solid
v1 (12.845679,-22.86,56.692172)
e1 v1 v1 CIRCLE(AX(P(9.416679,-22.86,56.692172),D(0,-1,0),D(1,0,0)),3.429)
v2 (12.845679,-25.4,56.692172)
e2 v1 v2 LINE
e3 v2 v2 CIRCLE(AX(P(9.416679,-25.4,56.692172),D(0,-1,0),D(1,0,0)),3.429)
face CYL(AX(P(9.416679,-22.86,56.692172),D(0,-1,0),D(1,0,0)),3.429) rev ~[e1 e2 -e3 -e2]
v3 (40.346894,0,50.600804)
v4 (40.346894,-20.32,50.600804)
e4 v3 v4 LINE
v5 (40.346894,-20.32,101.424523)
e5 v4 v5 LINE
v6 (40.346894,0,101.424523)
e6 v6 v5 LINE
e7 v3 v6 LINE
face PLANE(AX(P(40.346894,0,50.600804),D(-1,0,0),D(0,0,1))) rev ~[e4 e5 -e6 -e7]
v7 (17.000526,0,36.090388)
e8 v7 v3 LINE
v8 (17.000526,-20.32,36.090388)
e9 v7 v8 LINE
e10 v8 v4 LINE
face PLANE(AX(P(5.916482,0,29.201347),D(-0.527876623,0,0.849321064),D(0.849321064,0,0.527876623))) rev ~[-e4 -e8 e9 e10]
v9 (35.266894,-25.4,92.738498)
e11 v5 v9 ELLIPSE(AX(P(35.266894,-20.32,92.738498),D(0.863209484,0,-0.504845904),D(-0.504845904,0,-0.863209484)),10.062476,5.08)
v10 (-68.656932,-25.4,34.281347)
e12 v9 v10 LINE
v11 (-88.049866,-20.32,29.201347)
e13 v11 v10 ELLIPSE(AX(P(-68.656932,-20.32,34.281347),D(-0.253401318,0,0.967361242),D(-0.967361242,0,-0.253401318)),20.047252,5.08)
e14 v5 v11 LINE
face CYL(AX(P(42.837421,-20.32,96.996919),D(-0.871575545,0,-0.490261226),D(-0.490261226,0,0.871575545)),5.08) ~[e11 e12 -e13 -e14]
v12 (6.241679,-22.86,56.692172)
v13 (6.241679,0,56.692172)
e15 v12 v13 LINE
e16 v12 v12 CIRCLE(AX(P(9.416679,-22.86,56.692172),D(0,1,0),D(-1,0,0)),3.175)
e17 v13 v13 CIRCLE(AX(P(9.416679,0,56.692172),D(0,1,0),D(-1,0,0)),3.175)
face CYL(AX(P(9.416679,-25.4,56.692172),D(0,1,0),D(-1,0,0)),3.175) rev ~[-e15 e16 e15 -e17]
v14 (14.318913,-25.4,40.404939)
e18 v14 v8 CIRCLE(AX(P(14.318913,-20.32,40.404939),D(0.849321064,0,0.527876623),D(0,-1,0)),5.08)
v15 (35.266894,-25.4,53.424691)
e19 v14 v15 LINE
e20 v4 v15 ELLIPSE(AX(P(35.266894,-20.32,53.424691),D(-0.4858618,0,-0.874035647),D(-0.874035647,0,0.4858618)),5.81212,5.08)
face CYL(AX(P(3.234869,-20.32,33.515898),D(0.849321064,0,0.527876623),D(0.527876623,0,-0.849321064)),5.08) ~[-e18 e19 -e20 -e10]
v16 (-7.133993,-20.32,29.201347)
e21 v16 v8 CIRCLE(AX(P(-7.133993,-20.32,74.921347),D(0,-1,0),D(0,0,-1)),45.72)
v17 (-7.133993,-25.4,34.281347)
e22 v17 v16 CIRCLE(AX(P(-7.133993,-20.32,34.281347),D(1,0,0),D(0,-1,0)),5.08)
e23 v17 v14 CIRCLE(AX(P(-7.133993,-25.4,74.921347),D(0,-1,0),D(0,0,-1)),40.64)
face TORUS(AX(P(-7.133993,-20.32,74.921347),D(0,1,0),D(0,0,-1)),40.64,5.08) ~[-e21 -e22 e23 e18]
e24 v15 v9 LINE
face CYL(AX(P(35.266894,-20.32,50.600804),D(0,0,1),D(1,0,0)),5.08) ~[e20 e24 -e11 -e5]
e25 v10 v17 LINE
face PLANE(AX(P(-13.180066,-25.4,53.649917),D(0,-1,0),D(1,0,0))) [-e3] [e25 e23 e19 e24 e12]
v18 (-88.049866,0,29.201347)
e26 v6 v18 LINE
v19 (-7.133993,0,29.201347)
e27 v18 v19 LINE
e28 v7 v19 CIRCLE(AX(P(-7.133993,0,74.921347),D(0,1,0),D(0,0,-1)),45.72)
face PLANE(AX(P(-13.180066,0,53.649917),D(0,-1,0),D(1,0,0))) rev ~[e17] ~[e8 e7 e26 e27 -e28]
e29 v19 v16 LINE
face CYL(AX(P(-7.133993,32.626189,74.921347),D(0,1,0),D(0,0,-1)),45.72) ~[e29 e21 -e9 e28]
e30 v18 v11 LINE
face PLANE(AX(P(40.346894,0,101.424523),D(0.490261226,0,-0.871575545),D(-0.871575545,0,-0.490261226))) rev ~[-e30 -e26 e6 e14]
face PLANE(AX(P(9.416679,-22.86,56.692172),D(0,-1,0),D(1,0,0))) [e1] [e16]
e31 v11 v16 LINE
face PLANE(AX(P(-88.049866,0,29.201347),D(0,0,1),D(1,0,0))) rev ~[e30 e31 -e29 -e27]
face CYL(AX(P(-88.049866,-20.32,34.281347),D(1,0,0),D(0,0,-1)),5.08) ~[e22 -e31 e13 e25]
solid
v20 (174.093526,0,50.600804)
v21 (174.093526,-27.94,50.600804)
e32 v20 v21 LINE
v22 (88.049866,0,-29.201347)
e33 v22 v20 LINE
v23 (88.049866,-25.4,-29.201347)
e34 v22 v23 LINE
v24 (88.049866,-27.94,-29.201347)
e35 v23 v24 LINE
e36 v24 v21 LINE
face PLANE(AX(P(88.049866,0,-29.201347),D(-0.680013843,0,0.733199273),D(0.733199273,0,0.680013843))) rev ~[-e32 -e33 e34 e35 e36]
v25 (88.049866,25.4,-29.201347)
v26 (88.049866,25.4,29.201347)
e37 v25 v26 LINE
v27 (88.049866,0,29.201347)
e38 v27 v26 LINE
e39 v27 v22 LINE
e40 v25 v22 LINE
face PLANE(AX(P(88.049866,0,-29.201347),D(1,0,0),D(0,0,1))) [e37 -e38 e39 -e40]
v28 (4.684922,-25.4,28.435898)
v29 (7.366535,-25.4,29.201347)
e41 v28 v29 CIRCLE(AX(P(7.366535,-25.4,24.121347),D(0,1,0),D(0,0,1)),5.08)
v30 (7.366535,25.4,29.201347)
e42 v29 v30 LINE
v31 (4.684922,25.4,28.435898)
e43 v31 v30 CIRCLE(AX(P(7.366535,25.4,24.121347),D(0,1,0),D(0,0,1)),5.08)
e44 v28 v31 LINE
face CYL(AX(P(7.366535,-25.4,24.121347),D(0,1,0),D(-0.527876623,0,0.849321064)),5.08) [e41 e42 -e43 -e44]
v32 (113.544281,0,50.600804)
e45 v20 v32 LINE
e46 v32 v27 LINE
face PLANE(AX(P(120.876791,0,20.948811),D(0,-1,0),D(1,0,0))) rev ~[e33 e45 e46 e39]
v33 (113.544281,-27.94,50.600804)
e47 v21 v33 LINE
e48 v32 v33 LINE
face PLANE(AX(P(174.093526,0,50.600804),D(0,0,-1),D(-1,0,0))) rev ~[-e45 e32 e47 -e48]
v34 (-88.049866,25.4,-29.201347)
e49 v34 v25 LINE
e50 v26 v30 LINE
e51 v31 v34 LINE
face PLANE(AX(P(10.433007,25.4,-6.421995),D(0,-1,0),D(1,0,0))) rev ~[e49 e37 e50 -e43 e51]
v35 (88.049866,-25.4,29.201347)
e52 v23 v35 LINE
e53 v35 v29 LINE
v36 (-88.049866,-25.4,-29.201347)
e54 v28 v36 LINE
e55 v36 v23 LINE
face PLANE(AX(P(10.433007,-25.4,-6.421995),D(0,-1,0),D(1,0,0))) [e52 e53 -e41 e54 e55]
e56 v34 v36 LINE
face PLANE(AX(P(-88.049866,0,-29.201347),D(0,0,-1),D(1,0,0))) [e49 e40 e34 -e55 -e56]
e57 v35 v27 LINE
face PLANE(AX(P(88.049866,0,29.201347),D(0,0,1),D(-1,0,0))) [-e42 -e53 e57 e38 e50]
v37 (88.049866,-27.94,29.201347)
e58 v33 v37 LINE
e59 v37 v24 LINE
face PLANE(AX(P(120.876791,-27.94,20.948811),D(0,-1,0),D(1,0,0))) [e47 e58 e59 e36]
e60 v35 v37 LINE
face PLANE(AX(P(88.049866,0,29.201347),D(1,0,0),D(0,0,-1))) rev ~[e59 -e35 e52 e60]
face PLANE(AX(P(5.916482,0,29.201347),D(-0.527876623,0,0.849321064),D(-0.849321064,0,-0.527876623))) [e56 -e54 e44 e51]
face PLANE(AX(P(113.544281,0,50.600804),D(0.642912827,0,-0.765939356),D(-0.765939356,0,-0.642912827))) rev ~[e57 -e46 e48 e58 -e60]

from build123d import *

# Parameters (mm, degrees)
F1_DEPTH       = 25.4
F2_DEPTH       = 25.4
F3_DEPTH       = 27.94
F4_R           = 5.08
F5_R           = 5.08
F6_T1_DEPTH    = 58.0261887235
F6_T4_ANGLE    = 31.8620987779
F8_D           = 6.35
F8_CBORE_D     = 6.858
F8_CBORE_DEPTH = 2.54


# Not quite as in the source:
# - a fillet or chamfer that OpenCascade refuses, or shapes differently, is made with other operations: its cross-section is extruded or revolved along the edge and cut away or added


with BuildPart() as f1:
    # F0 (on Front) → F1 (new body, symmetric)
    with BuildSketch(Plane.XZ):
        Polygon((5.9164824631, 29.2013473809), (-88.0498662591, -29.2013473809), (88.0498662591, -29.2013473809), (88.0498662591, 29.2013473809), align=None)
    extrude(amount=F1_DEPTH, both=True)

    # F0 (on Front) → F3 (join)
    with BuildSketch(Plane.XZ):
        Polygon((88.0498662591, 29.2013473809), (88.0498662591, -29.2013473809), (174.0935258567, 50.6008043885), (113.5442811233, 50.6008043885), align=None)
    extrude(amount=F3_DEPTH)

    # F5
    f5_edges = [f1.edges().sort_by_distance(p)[0] for p in [
        (5.916482, 0, 29.201347),
    ]]
    fillet(f5_edges, radius=F5_R)


with BuildPart() as f2:
    # F0 (on Front) → F2 (new body)
    with BuildSketch(Plane.XZ):
        Polygon((40.3468944132, 101.4245226979), (-88.0498662591, 29.2013473809), (5.9164824631, 29.2013473809), (40.3468944132, 50.6008043885), align=None)
    extrude(amount=F2_DEPTH)

    # F4
    f4_edges = [f2.edges().sort_by_distance(p)[0] for p in [
        (-23.851486, -25.4, 65.312935),
        (40.346894, -25.4, 76.012664),
        (23.131688, -25.4, 39.901076),
        (-41.066692, -25.4, 29.201347),
    ]]
    fillet(f4_edges, radius=F4_R)

    # F6: fillet of radius 45.72 on 1 edges, made by hand

    # F6_s2 → F6_t1 (cut)
    with BuildSketch(Plane.XZ.offset(-32.6261887235)):
        with BuildLine():
            ThreePointArc((-7.1339930263, 29.2013473809), (5.4152490139, 30.9573288633), (17.0005261967, 36.0903883163))
            Line((17.0005261967, 36.0903883163), (5.9164824631, 29.2013473809))
            Line((5.9164824631, 29.2013473809), (-7.1339930263, 29.2013473809))
        make_face()
    extrude(amount=F6_T1_DEPTH, mode=Mode.SUBTRACT)

    # F6_s3 → F6_t4 (revolve, cut)
    with BuildSketch(Plane.YZ.offset(-7.1339930263)):
        with BuildLine():
            ThreePointArc((-25.4, 34.2813473809), (-23.9121024484, 30.6892449324), (-20.32, 29.2013473809))
            Line((-20.32, 29.2013473809), (-25.4, 29.2013473809))
            Line((-25.4, 29.2013473809), (-25.4, 34.2813473809))
        make_face()
    revolve(axis=Axis((-7.1339930263, -25.4, 74.9213473809), (0, -1, 0)), revolution_arc=F6_T4_ANGLE, mode=Mode.SUBTRACT)

    # F8 (through all)
    with Locations(Plane.XZ.offset(25.4)):
        with Locations((9.4166789204, 56.6921718419)):
            CounterBoreHole(F8_D / 2, F8_CBORE_D / 2, F8_CBORE_DEPTH)


solid = Compound([f1.part, f2.part])
